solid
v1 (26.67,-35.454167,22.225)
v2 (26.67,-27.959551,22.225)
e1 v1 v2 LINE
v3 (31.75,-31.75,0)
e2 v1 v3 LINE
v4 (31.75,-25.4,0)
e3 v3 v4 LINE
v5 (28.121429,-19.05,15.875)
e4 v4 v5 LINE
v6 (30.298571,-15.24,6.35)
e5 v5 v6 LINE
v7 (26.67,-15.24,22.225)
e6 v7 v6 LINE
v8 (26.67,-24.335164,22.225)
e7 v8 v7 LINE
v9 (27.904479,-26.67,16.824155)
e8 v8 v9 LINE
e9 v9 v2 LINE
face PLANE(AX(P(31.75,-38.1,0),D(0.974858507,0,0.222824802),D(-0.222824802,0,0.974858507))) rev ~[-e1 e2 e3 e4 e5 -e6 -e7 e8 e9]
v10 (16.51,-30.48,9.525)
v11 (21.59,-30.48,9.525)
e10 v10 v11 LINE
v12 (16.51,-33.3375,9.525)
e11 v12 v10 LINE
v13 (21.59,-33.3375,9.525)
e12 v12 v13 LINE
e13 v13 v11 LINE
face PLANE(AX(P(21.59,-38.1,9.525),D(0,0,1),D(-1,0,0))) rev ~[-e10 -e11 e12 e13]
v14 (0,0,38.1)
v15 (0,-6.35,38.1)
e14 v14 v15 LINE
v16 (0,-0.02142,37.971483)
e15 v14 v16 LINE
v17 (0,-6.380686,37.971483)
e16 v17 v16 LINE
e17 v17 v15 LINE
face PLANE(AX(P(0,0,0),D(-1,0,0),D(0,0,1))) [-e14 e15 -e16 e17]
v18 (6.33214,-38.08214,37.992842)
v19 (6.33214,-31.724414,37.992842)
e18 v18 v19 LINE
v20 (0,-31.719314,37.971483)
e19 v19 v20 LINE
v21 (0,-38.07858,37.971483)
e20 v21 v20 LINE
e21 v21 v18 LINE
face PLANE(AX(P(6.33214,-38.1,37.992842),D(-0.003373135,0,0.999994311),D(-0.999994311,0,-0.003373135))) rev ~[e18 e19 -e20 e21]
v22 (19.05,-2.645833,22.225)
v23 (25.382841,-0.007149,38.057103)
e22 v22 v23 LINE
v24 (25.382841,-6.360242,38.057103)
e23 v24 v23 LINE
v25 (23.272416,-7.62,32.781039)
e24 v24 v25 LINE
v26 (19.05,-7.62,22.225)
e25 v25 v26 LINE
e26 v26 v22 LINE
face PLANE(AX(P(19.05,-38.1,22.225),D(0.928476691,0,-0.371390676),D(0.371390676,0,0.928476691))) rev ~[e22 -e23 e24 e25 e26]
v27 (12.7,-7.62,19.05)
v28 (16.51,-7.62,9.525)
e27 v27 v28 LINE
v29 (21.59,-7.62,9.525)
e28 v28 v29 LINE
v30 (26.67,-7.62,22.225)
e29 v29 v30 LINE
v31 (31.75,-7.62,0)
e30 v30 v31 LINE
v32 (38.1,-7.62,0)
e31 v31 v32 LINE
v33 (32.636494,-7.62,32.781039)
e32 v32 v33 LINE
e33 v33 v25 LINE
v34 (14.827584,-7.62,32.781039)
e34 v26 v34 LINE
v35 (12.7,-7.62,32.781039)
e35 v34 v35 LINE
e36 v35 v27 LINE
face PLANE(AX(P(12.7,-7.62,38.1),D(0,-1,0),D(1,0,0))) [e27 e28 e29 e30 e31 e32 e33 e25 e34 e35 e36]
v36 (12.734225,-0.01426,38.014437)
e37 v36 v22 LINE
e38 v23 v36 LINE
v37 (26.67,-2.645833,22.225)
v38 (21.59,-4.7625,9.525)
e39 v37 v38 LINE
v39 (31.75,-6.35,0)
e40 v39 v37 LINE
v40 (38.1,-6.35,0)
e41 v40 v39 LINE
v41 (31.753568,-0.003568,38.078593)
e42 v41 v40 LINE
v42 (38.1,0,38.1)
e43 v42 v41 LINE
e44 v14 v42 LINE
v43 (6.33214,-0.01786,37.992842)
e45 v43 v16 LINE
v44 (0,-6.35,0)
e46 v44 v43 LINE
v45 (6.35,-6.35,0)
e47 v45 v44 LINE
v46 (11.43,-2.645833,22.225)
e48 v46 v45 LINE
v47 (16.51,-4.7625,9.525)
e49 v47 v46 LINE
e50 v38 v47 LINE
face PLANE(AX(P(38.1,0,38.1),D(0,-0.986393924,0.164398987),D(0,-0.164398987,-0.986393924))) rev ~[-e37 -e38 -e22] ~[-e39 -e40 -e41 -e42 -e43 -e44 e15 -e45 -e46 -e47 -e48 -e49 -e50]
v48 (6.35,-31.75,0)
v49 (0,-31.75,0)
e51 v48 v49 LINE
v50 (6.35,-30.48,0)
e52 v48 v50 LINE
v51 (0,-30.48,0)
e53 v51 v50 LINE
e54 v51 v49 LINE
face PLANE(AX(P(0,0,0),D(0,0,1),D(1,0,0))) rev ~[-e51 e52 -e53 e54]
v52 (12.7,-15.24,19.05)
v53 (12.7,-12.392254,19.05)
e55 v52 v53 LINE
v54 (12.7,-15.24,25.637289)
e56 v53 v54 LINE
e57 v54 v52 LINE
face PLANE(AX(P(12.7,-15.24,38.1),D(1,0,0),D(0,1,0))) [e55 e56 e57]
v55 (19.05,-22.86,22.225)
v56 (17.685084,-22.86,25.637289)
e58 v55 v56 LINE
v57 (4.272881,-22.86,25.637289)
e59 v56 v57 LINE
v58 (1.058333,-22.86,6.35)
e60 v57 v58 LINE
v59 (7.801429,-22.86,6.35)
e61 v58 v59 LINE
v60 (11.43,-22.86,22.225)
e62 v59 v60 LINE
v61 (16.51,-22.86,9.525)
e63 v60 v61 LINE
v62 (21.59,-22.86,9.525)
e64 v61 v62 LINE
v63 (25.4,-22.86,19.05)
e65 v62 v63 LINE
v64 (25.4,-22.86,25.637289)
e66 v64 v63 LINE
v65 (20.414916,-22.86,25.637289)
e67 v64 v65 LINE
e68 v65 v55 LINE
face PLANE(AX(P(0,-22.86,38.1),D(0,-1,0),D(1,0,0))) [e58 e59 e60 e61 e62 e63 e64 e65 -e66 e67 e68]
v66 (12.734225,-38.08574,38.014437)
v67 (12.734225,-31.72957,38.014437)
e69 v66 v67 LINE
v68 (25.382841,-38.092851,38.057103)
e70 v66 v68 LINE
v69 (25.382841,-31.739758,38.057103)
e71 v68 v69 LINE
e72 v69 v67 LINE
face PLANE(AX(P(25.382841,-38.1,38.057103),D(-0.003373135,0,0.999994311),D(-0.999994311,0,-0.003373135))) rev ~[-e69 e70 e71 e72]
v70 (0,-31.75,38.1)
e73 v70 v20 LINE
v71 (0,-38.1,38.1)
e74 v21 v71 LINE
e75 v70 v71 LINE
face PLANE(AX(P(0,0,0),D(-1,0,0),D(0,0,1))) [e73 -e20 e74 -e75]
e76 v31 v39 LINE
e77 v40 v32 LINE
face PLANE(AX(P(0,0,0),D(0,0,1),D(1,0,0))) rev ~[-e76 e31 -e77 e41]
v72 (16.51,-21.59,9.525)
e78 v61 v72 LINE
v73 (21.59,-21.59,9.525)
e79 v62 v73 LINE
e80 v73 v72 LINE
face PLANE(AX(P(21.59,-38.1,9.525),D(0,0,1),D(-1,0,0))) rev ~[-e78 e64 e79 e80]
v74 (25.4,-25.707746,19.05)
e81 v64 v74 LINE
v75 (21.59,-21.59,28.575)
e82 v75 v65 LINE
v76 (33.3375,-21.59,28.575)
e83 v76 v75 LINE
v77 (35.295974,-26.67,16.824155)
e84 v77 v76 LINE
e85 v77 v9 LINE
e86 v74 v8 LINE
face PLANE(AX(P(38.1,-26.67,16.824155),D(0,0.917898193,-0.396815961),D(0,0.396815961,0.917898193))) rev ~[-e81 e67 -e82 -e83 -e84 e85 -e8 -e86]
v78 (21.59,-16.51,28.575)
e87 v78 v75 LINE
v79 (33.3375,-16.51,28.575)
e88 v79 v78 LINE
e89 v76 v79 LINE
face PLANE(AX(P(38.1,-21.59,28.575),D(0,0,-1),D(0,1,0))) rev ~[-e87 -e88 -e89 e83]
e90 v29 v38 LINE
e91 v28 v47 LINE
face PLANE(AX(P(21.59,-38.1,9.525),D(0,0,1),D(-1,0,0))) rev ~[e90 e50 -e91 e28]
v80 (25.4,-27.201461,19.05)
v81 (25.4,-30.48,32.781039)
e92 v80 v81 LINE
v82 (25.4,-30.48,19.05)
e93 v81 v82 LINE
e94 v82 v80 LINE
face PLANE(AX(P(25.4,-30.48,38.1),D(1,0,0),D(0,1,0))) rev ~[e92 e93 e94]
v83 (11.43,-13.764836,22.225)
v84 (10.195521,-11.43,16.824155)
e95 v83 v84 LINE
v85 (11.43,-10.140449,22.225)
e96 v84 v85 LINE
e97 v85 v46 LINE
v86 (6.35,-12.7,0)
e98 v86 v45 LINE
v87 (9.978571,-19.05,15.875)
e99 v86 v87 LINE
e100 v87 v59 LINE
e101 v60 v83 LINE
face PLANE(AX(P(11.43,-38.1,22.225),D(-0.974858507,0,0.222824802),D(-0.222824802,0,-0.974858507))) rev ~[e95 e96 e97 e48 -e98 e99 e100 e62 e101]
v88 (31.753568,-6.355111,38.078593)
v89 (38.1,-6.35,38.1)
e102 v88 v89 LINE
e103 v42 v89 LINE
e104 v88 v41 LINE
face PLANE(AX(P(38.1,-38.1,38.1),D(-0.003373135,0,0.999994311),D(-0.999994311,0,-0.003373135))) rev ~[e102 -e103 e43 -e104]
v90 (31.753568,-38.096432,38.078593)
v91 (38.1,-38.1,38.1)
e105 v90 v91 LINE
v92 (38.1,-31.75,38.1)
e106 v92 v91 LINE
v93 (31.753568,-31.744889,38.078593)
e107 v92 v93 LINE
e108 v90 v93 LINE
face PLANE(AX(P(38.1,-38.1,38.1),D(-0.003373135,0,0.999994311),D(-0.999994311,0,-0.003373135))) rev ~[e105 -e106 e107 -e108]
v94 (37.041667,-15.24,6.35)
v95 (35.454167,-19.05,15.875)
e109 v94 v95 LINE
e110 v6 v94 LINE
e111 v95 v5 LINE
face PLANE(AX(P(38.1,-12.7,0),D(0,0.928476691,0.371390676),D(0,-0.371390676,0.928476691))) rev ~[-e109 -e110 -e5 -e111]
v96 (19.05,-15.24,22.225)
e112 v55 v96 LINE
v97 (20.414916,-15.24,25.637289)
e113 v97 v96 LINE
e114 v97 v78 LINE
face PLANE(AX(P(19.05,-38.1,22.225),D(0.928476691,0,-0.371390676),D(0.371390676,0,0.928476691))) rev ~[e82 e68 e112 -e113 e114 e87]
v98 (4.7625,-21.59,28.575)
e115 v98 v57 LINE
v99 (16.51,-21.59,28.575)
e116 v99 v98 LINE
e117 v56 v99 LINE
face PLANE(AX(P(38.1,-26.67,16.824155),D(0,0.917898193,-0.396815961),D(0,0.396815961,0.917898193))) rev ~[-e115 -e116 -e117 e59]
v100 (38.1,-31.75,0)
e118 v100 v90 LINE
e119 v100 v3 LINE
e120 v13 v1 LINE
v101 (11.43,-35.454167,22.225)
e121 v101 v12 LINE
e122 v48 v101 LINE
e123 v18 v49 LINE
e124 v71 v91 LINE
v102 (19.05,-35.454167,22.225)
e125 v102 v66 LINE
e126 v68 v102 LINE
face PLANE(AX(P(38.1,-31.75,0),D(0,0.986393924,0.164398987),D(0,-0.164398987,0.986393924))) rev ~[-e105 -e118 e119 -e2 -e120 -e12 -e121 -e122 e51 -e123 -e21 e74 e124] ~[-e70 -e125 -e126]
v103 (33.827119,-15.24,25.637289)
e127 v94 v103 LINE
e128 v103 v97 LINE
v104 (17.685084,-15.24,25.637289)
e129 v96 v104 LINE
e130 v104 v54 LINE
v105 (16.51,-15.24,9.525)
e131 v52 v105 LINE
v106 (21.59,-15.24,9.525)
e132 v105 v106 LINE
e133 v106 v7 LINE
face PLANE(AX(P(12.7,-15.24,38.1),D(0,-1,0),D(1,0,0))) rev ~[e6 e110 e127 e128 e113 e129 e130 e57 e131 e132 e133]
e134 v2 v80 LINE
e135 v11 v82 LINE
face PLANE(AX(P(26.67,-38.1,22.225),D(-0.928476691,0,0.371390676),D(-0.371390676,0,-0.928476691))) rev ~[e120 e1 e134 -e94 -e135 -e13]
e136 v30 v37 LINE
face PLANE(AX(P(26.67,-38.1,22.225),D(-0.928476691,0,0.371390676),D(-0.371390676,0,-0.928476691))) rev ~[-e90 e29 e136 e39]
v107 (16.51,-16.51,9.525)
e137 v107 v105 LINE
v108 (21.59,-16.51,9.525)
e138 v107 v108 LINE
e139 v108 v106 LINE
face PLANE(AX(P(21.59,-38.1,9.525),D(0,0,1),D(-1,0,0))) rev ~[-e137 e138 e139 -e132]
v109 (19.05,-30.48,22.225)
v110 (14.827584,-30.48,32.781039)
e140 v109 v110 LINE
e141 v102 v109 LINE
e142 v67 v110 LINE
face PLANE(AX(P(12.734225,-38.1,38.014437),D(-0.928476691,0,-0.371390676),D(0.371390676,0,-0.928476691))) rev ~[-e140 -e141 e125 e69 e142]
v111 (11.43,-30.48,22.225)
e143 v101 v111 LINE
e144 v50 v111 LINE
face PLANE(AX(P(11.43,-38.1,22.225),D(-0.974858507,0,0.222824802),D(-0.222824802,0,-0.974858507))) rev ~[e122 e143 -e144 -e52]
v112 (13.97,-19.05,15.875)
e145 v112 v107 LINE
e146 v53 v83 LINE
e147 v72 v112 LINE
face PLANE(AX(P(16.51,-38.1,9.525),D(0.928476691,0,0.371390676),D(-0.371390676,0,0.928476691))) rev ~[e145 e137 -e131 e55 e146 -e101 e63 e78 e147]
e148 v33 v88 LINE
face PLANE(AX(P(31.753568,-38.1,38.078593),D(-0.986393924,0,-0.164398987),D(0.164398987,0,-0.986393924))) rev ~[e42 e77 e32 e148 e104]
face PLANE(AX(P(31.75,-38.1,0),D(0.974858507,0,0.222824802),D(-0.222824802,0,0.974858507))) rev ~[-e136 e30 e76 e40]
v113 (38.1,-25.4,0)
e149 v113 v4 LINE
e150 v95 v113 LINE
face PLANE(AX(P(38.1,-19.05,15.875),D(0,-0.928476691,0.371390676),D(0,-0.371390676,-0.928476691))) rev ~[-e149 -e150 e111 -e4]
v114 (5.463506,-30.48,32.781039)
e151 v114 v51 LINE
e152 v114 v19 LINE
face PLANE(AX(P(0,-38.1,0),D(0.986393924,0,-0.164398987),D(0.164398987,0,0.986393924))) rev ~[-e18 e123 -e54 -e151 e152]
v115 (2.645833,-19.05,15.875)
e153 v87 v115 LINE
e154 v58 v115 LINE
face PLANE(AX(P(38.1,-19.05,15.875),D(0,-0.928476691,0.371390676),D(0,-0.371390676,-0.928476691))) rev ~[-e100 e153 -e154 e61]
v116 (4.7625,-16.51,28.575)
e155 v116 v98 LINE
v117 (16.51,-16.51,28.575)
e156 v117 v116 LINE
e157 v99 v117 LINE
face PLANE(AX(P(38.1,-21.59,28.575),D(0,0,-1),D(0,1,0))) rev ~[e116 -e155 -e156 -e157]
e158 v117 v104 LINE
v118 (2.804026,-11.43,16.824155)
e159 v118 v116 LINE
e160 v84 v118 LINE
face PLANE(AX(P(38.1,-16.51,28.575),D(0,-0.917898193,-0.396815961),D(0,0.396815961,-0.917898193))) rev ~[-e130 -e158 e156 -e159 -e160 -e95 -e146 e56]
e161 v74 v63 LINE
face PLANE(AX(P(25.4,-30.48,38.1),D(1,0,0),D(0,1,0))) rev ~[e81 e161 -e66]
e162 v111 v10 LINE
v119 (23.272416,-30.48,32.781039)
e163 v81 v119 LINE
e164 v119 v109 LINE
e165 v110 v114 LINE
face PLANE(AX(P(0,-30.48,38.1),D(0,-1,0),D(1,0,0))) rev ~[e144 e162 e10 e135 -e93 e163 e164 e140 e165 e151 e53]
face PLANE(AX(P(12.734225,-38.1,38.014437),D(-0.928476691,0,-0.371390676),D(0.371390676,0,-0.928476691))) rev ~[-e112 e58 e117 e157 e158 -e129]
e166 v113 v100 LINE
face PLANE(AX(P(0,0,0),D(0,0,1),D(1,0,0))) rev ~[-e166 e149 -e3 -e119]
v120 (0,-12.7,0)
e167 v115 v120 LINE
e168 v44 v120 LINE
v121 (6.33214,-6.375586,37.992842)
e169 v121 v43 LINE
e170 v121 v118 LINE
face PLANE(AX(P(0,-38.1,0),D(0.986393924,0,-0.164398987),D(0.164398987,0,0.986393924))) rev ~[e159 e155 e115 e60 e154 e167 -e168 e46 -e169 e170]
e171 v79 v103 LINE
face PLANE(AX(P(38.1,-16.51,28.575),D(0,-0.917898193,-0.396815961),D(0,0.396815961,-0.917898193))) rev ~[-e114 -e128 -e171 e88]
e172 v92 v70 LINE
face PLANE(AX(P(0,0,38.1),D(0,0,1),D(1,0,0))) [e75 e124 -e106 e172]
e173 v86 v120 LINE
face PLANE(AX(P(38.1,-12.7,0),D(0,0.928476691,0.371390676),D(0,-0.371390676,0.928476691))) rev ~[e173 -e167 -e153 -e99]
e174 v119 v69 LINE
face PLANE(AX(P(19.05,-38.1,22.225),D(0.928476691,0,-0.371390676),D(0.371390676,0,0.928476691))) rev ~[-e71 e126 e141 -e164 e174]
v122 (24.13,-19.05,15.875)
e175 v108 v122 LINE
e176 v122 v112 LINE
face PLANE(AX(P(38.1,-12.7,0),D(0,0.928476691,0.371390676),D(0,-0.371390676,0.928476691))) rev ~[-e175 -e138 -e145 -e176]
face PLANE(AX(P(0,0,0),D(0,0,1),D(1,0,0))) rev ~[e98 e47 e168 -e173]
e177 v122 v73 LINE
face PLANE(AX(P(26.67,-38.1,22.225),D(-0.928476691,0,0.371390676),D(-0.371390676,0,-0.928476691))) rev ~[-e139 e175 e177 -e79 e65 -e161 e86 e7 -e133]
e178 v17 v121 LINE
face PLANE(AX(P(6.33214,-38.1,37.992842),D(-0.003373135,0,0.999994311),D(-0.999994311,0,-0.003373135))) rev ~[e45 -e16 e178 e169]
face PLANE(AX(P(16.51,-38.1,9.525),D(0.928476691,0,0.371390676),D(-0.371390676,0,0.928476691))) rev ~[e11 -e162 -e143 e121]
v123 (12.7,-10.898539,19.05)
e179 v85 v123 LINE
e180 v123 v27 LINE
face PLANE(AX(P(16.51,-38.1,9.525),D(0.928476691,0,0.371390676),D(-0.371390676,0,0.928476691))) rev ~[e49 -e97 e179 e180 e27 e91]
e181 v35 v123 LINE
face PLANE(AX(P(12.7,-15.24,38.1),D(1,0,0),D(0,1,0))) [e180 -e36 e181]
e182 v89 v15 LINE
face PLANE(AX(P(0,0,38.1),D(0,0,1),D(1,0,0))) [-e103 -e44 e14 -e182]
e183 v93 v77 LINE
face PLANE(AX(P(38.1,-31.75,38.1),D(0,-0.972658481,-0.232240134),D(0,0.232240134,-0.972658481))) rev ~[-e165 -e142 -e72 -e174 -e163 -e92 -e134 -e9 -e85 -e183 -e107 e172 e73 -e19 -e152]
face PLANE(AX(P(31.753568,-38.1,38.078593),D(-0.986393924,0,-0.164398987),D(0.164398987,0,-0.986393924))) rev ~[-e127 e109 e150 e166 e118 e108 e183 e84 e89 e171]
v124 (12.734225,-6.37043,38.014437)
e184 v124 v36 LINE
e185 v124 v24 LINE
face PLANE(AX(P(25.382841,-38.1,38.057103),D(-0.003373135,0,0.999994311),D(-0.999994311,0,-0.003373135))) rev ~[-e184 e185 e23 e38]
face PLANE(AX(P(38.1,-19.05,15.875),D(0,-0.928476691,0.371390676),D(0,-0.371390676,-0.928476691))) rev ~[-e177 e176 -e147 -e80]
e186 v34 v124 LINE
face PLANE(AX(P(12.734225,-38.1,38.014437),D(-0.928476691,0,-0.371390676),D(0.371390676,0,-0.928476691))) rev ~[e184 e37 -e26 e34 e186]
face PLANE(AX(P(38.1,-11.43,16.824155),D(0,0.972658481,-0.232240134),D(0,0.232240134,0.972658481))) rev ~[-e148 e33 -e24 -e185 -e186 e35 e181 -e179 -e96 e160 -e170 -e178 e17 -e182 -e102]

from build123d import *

# Parameters (mm, degrees)
F0_W      = 38.1
F0_H      = 38.1
F1_DEPTH  = 38.1
F6_DEPTH  = 38.1
F9_DEPTH  = 38.1
F10_W     = 25.4
F10_H     = 7.62
F11_DEPTH = 38.1


with BuildPart() as f1:
    # F0 (on Front) → F1 (new body)
    with BuildSketch(Plane.XZ):
        with Locations((19.05, 19.05)):
            Rectangle(F0_W, F0_H)
    extrude(amount=F1_DEPTH)

    # F5 (on offset) → F6 (cut)
    with BuildSketch(Plane.YZ.offset(38.1)):
        Polygon((-6.35, 38.1), (-31.75, 38.1), (-26.67, 16.8241550819), (-21.59, 28.575), (-16.51, 28.575), (-11.43, 16.8241550819), align=None)
        Polygon((-31.75, 0), (-38.1, 38.1), (-38.1, 0), align=None)
        Polygon((-19.05, 15.875), (-25.4, 0), (-22.9262417018, 0), (-19.05, 0), (-12.7, 0), align=None)
        Polygon((0, 0), (0, 38.1), (-6.35, 0), align=None)
    extrude(amount=-F6_DEPTH, mode=Mode.SUBTRACT)

    # F8 (on face) → F9 (cut)
    with BuildSketch(Plane.XZ.offset(38.1)):
        Polygon((0, 37.9714828326), (0, 0), (6.3321403529, 37.9928421172), align=None)
        Polygon((11.43, 22.225), (6.35, 0), (31.75, 0), (26.67, 22.225), (21.59, 9.525), (16.51, 9.525), align=None)
        Polygon((25.382841226, 38.057103065), (12.7342250661, 38.0144373348), (19.05, 22.225), align=None)
        Polygon((31.7535679155, 38.0785925072), (38.1, 0), (38.1, 38.1), align=None)
    extrude(amount=-F9_DEPTH, mode=Mode.SUBTRACT)

    # F10 (on offset) → F11 (cut)
    with BuildSketch(Plane.XY.offset(38.1)):
        with Locations((25.4, -11.43)):
            Rectangle(F10_W, F10_H)
        with Locations((12.7, -26.67)):
            Rectangle(F10_W, F10_H)
    extrude(amount=-F11_DEPTH, mode=Mode.SUBTRACT)


solid = f1.part
